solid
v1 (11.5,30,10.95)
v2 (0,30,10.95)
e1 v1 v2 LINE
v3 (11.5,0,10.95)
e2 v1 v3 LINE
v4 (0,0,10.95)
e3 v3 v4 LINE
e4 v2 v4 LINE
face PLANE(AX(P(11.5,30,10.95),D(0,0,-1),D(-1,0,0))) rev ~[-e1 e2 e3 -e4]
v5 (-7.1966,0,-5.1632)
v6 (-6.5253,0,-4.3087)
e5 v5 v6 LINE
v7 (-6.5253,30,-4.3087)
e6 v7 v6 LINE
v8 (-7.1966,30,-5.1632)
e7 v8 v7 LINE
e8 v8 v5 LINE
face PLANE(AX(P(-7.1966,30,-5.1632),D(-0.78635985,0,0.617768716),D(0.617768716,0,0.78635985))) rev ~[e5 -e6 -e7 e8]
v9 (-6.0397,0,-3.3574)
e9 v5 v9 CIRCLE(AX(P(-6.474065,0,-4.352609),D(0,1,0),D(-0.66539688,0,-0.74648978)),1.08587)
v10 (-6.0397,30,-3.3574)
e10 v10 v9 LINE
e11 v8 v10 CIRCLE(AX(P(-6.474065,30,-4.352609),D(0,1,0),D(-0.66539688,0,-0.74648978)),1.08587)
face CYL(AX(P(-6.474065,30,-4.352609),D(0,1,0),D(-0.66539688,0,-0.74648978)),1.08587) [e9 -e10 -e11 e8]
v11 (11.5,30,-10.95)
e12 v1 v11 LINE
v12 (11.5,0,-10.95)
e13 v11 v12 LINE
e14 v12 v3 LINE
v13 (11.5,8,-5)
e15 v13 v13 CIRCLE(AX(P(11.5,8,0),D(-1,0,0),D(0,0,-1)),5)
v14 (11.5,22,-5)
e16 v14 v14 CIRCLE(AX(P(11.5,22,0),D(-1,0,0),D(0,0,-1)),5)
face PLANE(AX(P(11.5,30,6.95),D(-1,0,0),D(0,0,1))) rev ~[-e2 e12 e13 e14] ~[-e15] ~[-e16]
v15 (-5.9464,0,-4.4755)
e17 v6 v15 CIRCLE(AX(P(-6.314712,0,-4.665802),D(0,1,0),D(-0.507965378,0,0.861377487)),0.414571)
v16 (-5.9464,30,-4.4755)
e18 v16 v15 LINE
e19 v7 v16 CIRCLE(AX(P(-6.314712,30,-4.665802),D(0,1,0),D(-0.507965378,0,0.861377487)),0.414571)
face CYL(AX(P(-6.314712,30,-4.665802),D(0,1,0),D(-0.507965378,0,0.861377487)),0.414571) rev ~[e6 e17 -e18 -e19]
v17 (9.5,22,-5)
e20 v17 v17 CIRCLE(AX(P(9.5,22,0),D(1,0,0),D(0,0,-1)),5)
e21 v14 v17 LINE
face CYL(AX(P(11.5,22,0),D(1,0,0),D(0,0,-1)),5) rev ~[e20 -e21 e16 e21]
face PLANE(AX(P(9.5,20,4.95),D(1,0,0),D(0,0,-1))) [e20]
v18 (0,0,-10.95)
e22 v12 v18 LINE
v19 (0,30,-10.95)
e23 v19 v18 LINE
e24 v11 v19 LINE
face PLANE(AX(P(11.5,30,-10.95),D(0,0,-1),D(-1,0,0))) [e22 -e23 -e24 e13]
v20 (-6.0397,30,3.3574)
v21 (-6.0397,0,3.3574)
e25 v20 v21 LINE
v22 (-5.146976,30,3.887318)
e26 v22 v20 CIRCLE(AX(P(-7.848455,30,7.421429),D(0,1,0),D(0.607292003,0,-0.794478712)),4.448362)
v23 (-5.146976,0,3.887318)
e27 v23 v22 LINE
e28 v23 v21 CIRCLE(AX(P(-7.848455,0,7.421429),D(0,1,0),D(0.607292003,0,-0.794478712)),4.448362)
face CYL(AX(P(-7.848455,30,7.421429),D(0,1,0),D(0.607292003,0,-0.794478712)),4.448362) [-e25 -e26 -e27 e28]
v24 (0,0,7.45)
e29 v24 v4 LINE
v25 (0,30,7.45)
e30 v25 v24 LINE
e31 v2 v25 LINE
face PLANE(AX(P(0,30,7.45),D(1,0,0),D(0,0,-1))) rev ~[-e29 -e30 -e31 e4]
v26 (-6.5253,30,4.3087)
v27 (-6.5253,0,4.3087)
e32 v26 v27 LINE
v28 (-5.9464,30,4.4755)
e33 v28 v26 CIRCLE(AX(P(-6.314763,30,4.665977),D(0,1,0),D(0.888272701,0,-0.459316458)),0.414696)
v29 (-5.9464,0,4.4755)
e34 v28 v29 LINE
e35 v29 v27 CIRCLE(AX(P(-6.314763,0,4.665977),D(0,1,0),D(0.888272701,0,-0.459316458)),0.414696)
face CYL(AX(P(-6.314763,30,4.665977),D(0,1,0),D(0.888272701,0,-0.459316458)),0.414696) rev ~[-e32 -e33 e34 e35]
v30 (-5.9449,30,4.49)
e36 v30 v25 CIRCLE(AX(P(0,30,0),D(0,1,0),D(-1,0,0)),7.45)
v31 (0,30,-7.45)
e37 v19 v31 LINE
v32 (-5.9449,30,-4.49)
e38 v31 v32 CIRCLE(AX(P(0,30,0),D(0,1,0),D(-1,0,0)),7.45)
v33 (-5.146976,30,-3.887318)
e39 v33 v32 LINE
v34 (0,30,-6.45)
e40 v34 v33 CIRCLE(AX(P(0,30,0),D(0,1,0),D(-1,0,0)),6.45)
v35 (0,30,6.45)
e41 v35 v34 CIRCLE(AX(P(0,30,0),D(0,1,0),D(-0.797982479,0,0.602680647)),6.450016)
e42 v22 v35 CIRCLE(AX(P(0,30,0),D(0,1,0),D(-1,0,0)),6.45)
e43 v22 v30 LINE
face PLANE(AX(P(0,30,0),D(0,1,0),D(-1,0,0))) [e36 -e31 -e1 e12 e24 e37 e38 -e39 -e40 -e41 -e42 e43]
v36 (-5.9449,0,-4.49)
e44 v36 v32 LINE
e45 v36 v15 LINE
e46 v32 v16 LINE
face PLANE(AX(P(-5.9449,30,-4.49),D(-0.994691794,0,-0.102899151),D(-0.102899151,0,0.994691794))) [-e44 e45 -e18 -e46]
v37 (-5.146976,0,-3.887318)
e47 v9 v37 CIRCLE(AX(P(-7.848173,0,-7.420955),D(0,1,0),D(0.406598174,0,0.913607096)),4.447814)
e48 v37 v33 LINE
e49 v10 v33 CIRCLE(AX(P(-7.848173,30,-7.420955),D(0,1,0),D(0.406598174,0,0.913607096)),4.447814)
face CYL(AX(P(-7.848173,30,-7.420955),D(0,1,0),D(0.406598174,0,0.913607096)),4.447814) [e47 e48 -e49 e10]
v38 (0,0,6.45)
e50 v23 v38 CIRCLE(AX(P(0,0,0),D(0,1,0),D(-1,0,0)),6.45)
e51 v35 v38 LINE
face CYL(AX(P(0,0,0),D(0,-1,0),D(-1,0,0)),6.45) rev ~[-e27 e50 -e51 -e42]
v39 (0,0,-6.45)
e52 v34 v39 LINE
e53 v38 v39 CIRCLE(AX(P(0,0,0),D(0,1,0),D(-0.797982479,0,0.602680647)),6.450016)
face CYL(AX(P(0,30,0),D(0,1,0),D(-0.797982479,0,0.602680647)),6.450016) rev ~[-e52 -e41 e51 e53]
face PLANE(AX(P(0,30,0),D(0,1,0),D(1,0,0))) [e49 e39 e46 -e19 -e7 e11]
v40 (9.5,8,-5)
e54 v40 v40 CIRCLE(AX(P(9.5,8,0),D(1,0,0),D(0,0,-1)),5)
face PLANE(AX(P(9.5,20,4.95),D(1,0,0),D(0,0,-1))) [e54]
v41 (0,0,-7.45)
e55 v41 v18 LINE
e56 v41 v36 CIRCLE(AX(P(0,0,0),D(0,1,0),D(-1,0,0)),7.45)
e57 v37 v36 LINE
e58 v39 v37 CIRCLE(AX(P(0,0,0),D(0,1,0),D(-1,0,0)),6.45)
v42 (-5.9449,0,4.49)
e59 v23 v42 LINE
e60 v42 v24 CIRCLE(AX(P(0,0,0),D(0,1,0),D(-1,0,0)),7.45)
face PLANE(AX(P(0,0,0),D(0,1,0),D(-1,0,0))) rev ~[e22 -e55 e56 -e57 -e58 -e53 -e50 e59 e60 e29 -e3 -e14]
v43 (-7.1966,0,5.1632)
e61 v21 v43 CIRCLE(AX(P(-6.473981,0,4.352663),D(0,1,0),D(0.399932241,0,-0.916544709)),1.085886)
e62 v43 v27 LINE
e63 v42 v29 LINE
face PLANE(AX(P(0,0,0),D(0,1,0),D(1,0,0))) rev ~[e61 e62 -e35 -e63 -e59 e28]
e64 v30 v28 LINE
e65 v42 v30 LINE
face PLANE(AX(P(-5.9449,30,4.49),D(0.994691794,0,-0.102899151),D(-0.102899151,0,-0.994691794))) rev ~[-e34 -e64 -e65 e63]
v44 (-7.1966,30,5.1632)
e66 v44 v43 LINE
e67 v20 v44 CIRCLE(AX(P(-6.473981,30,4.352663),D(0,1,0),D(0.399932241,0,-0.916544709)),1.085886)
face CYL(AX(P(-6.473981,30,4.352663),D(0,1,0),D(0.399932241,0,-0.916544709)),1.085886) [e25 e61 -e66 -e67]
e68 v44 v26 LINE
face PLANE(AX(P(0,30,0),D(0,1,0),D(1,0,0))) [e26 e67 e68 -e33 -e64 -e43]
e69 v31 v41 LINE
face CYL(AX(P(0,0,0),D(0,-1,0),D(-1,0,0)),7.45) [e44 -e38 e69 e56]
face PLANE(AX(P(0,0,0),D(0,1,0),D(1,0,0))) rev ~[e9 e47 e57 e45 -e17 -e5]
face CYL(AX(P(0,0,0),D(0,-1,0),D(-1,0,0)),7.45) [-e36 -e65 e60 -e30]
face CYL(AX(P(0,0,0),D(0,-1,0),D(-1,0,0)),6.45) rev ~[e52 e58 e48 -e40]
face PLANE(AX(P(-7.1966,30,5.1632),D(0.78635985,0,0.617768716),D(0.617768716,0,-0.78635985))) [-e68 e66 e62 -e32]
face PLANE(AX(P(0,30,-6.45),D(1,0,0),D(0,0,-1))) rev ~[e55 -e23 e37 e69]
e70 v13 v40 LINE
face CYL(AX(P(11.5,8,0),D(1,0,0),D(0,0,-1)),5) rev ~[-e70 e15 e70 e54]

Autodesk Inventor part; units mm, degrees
ref_plane "YZ Plane" through (0, 0, 0) normal (1, 0, 0) x (0, 1, 0)
ref_plane "XZ Plane" through (0, 0, 0) normal (0, 1, 0) x (-1, 0, 0)
ref_plane "XY Plane" through (0, 0, 0) normal (0, 0, 1) x (1, 0, 0)
sketch "Эскиз1" plane through (0, 0, 0) normal (0, 1, 0) x (-1, 0, 0)
  circle A0 centre (0, 0) radius 6.45
  circle A1 centre (0, 0) radius 7.45
  line L0 (0, 0) -> (5.9449, 4.49)
  line L1 (0, 0) -> (5.9449, -4.49)
  point P0 (5.147, -3.8873)
  point P1 (5.147, 3.8873)
  dimension "d0" = 12.9
  dimension "d1" = 14.9
extrude "Выдавливание1" add sketch "Эскиз1" along normal blind 30 contours A0 L1 A1 L0 picked at (-6.4749, 2.8302)
sketch "Эскиз2" plane through (0, 30, 0) normal (0, 1, 0) x (1, 0, 0)
  arc A0 (-5.147, -3.8873) -> (-6.0397, -3.3574) centre (-7.8483, -7.4212) ccw
  arc A1 (-6.0397, -3.3574) -> (-7.1966, -5.1632) centre (-6.474, -4.3526) ccw
  line L0 (-7.1966, -5.1632) -> (-6.5253, -4.3087)
  arc A2 (-5.9464, -4.4755) -> (-6.5253, -4.3087) centre (-6.3147, -4.6659) ccw
  line L1 (-5.147, -3.8873) -> (-5.9449, -4.49)
  line L2 (-5.9449, -4.49) -> (-5.147, -3.8873)
  line L3 (-5.9449, -4.49) -> (-5.9464, -4.4755)
  line L4 (-0.0151, 0) -> (-3.489, 0)
  arc A3 (-6.0397, 3.3574) -> (-5.147, 3.8873) centre (-7.8483, 7.4212) ccw
  arc A4 (-6.5253, 4.3087) -> (-5.9464, 4.4755) centre (-6.3147, 4.6659) ccw
  line L5 (-5.147, 3.8873) -> (-5.9449, 4.49)
  line L6 (-5.9449, 4.49) -> (-5.147, 3.8873)
  line L7 (-5.9449, 4.49) -> (-5.9464, 4.4755)
  arc A5 (-7.1966, 5.1632) -> (-6.0397, 3.3574) centre (-6.474, 4.3526) ccw
  line L8 (-7.1966, 5.1632) -> (-6.5253, 4.3087)
  point P0 (-5.147, 3.8873)
  point P1 (-5.9449, -4.49)
  point P2 (-5.3694, -4.0591)
  point P3 (-5.9449, 4.49)
  point P4 (-5.3694, 4.0591)
  point P5 (-5.9449, 4.49)
  dimension "d25" = 1.0859
sketch "Эскиз3" plane through (0, 30, 0) normal (0, 1, 0) x (1, 0, 0)
  arc A0 (-5.9449, -4.49) -> (-5.9449, 4.49) centre (0, 0) ccw projected
  line L0 (11.5, -6.95) -> (11.5, 6.95)
  arc A1 (-5.147, -3.8873) -> (-5.147, 3.8873) centre (0, 0) ccw projected
  line L1 (0, -7.45) -> (0, -6.45)
  line L2 (0, 6.45) -> (0, 7.45)
  line L3 (11.5, 6.95) -> (11.5, 10.95)
  line L4 (11.5, -6.95) -> (11.5, -10.95)
  line L5 (0, 2.95) -> (0, 7.45)
  line L6 (11.5, -10.95) -> (0, -10.95)
  line L7 (0, -10.95) -> (0, -7.45)
  line L8 (11.5, 10.95) -> (0, 10.95)
  line L9 (0, 10.95) -> (0, 7.45)
  arc A2 (0, -6.45) -> (0, 6.45) centre (0, 0) ccw
  dimension "d13" = 4
  dimension "d14" = 4
  dimension "d22" = 21.9
  dimension "d23" = 4.5
extrude "Выдавливание3" add sketch "Эскиз3" against normal blind 30
ref_plane "РабПлоскость1" through (11.5, 20, 4.95) normal (1, 0, 0) x (0, 0, -1)
sketch "Эскиз4" plane through (11.5, 20, 4.95) normal (1, 0, 0) x (0, 0, -1)
  line L0 (4.95, -20) -> (4.95, 10)
  line L1 (1, 10) -> (8.9, 10) projected
  circle A0 centre (4.95, -12) radius 5
  line L2 (14.4, -20) -> (-4.5, -20) projected
  circle A1 centre (4.95, 2) radius 5
  line L3 (-4.5, 10) -> (14.4, 10) projected
  point P0 (7.3306, 10)
  point P1 (2.5694, 10)
  point P2 (4.95, 10)
  dimension "d15" = 10
  dimension "d16" = 8
  dimension "d17" = 10
  dimension "d18" = 8
extrude "Выдавливание4" cut sketch "Эскиз4" against normal blind 2
extrude "Выдавливание5" add sketch "Эскиз2" against normal blind 30
sketch "Эскиз5" plane through (0, 30, 0) normal (0, 1, 0) x (1, 0, 0)
  arc A0 (0, 7.45) -> (-5.9449, 4.49) centre (0, 0) ccw projected
  line L0 (-5.9449, 4.49) -> (-5.9464, 4.4755) projected
  arc A1 (-6.5253, 4.3087) -> (-5.9464, 4.4755) centre (-6.3147, 4.6659) ccw projected
  line L1 (-6.5253, 4.3087) -> (-7.1966, 5.1632) projected
  arc A2 (-7.1966, 5.1632) -> (-6.0397, 3.3574) centre (-6.474, 4.3526) ccw projected
  arc A3 (-6.0397, 3.3574) -> (-5.147, 3.8873) centre (-7.8483, 7.4212) ccw projected
  arc A4 (-5.147, -3.8873) -> (-5.147, 3.8873) centre (0, 0) ccw projected
  arc A5 (-5.147, -3.8873) -> (-6.0397, -3.3574) centre (-7.8483, -7.4212) ccw projected
  arc A6 (-6.0397, -3.3574) -> (-7.1966, -5.1632) centre (-6.474, -4.3526) ccw projected
  line L2 (-7.1966, -5.1632) -> (-6.5253, -4.3087) projected
  arc A7 (-5.9464, -4.4755) -> (-6.5253, -4.3087) centre (-6.3147, -4.6659) ccw projected
  line L3 (-5.9464, -4.4755) -> (-5.9449, -4.49) projected
  arc A8 (-5.9449, -4.49) -> (0, -7.45) centre (0, 0) ccw projected
  line L4 (0, -7.45) -> (0, -10.95) projected
  line L5 (0, -10.95) -> (11.5, -10.95) projected
  line L6 (11.5, -10.95) -> (11.5, 10.95) projected
  line L7 (11.5, 10.95) -> (0, 10.95) projected
  line L8 (0, 10.95) -> (0, 7.45) projected
  line L9 (0, 6.45) -> (0, 7.45)
  line L10 (0, -6.45) -> (0, -7.45)
sketch "Эскиз6" plane through (11.5, 30, 10.95) normal (1, 0, 0) x (0, 0, -1)
  arc A0 (15.95, -22) -> (15.95, -22) centre (10.95, -22) ccw projected
  arc A1 (15.95, -8) -> (15.95, -8) centre (10.95, -8) ccw projected
  point P0 (10.95, -30)
properties part number "крепление маркера 13мм"
